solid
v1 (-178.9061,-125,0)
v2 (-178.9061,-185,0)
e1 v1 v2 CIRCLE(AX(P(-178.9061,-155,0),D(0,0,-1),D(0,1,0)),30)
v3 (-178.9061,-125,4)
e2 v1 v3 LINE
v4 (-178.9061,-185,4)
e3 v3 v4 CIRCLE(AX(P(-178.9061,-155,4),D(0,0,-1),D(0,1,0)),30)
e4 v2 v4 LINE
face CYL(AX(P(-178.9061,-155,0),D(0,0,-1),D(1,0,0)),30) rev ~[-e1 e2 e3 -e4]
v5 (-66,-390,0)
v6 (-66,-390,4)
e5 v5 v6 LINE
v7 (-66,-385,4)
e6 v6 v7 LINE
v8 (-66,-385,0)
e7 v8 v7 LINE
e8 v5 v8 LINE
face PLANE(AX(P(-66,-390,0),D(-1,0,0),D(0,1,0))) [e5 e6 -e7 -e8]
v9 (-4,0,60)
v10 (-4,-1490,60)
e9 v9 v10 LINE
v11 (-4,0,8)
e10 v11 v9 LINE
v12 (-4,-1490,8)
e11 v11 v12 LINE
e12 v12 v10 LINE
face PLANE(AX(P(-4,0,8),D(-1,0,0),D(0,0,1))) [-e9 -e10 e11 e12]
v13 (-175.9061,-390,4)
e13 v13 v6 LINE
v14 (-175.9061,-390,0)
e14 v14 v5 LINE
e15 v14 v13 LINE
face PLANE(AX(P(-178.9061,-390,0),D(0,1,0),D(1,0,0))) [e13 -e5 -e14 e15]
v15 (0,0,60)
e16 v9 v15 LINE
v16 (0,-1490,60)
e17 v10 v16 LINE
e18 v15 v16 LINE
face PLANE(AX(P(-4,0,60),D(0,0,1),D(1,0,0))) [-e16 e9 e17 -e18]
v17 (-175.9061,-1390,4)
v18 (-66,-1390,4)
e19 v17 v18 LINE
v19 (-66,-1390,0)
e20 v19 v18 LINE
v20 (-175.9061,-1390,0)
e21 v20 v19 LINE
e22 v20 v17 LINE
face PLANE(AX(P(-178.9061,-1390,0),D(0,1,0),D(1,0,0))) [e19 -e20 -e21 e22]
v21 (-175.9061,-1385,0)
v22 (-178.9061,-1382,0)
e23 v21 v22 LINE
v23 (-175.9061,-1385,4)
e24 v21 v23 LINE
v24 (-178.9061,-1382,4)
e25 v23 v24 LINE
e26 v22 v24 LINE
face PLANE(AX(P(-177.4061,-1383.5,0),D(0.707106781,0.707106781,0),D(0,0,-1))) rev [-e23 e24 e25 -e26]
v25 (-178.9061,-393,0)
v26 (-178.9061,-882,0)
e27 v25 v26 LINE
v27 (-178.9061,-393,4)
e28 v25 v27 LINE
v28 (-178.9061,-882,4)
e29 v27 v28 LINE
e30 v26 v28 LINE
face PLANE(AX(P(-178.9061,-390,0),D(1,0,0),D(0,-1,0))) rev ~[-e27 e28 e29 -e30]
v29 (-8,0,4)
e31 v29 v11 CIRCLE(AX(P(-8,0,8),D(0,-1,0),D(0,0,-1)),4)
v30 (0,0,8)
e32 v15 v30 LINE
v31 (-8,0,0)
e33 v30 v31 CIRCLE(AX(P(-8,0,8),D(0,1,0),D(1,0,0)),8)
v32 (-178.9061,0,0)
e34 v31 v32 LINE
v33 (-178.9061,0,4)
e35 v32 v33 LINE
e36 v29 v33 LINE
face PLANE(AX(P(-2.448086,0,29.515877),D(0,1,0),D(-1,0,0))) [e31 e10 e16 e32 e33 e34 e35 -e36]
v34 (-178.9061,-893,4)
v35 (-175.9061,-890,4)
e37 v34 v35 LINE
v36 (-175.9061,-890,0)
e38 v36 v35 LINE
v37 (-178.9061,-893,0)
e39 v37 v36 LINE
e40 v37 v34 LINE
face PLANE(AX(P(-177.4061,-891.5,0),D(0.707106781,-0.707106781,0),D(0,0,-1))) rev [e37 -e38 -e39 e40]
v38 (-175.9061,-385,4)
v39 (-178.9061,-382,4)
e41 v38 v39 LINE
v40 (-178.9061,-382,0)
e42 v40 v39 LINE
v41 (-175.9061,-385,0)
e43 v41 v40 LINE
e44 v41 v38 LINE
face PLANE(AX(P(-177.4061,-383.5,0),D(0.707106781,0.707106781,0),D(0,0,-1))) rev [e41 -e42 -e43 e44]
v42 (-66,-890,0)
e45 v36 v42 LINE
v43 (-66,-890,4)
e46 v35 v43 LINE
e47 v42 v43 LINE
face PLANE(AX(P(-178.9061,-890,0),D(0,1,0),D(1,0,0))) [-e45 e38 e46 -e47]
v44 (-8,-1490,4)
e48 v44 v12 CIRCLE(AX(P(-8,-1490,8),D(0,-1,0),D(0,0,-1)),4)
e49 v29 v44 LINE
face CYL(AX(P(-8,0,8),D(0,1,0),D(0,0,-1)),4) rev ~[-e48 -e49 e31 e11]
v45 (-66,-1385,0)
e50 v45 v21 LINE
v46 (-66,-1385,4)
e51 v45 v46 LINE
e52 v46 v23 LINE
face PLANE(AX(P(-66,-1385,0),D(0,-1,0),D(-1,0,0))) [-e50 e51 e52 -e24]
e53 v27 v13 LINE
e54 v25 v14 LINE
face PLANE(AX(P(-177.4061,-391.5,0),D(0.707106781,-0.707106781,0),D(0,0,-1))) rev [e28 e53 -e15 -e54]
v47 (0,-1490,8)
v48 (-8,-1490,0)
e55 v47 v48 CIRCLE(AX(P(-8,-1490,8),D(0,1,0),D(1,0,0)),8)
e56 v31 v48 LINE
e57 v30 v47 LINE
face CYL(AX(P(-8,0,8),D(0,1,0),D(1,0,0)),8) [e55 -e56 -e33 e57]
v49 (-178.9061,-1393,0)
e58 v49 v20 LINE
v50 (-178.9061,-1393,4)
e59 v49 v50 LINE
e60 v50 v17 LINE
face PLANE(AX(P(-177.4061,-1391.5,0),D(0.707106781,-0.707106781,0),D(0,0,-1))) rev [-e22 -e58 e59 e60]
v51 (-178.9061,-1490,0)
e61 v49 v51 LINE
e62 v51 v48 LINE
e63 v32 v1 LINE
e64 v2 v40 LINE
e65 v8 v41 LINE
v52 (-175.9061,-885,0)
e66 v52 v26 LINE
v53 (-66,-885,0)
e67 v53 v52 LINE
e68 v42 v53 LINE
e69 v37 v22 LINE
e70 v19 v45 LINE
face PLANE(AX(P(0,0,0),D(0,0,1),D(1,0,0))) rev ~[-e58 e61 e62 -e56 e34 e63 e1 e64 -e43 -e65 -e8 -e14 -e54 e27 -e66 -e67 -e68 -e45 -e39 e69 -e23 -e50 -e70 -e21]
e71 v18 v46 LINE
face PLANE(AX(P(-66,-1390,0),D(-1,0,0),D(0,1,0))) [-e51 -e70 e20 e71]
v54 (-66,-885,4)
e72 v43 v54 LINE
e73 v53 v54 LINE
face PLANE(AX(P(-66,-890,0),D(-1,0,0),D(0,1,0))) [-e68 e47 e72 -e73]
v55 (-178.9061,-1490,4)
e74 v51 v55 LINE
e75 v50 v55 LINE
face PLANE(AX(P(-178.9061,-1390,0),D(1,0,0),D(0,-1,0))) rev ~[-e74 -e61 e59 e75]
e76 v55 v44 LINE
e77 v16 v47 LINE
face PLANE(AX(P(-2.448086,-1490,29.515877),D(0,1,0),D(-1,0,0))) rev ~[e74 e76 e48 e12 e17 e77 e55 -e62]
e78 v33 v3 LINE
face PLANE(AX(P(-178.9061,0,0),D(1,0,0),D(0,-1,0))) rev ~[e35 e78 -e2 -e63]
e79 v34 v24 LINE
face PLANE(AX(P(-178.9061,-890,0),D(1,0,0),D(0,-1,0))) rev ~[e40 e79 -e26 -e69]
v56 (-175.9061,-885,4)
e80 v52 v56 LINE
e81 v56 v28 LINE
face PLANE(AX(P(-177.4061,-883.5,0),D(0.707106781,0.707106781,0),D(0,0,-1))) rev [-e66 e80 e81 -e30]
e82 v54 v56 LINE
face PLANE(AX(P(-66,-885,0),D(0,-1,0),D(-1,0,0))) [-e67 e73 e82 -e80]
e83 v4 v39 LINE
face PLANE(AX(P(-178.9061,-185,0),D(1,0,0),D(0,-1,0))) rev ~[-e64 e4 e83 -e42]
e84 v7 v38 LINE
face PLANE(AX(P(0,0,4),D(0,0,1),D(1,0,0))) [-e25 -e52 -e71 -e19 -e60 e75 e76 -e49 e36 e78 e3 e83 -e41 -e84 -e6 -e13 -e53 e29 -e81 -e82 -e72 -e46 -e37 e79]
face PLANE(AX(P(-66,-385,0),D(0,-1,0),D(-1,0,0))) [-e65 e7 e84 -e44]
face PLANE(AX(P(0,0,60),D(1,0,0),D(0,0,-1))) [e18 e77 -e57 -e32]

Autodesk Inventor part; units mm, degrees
ref_plane "YZ Plane" through (0, 0, 0) normal (1, 0, 0) x (0, 1, 0)
ref_plane "XZ Plane" through (0, 0, 0) normal (0, 1, 0) x (-1, 0, 0)
ref_plane "XY Plane" through (0, 0, 0) normal (0, 0, 1) x (1, 0, 0)
sketch "Sketch1" plane through (0, 0, 0) normal (0, 0, 1) x (1, 0, 0)
  line L0 (0, 0) -> (-178.9061, 0)
  line L1 (-178.9061, 0) -> (-178.9061, -1490)
  line L2 (-178.9061, -1490) -> (0, -1490)
  line L3 (0, -1490) -> (0, 0)
  line L4 (-178.9061, -1390) -> (-66, -1390)
  line L5 (-66, -1390) -> (-66, -1385)
  line L6 (-66, -1385) -> (-178.9061, -1385)
  line L7 (-178.9061, -1385) -> (-178.9061, -1390)
  line L8 (-178.9061, -890) -> (-66, -890)
  line L9 (-66, -890) -> (-66, -885)
  line L10 (-66, -885) -> (-178.9061, -885)
  line L11 (-178.9061, -885) -> (-178.9061, -890)
  line L12 (-178.9061, -390) -> (-66, -390)
  line L13 (-66, -390) -> (-66, -385)
  line L14 (-66, -385) -> (-178.9061, -385)
  line L15 (-178.9061, -385) -> (-178.9061, -390)
  circle A0 centre (-178.9061, -155) radius 30
  point P0 (-178.9061, -390)
  point P1 (-178.9061, -885)
  point P2 (-178.9061, -125)
  point P3 (-178.9061, -185)
  dimension "d0" = 1490
  dimension "d1" = 178.9061
  dimension "d2" = 5
  dimension "d4" = 100
  dimension "d7" = 500
  dimension "d23" = 66
  dimension "d28" = 60
  dimension "d30" = 1335
extrude "Plate1" add sketch "Sketch1" along normal blind 4 contours L3 L2 L1 L4 L5 L6 L8 L9 L10 L12 L13 L14 A0 L0
sketch "Sketch2" plane through (-4, 0, 0) normal (1, 0, 0) x (0, 1, 0)
  line L0 (-1490, 0) -> (0, 0)
  line L1 (0, 0) -> (0, 60)
  line L2 (0, 60) -> (-1490, 60)
  line L3 (-1490, 60) -> (-1490, 0)
edge flange "Flange1" height 60 angle 90 thickness 4 bend radius 4 thickness toward (1, 0, 0) relief tear relief width 4 relief depth 2 edges at (0, -745, 4) wall of the first edge with corners at (-4, -1490, 0) (-4, 0, 0) (-4, 0, 60) (-4, -1490, 60)
bend "Bend1"
corner "Corner1"
chamfer "Corner Chamfer1" distance 3 angle 45 6 edges at (-178.9061, -1390, 2) (-178.9061, -1385, 2) (-178.9061, -890, 2) (-178.9061, -885, 2) (-178.9061, -385, 2) (-178.9061, -390, 2)
equation "\"d0\" = Стрингер_длина"
equation "\"d1\" = стрингер_глубина_2"
equation "\"d2\" = паз_под_стрингер_толщина"
equation "\"d23\" = паз_под_стрингер_глубина - Thickness"
equation "\"d28\" = 2 * радиус_выреза_под_сварку"
equation "\"d12\" = Thickness"
equation "\"d13\" = BendReliefWidth"
equation "\"d14\" = BendReliefDepth"
equation "\"d15\" = MinimumRemnant"
equation "\"d16\" = TransitionRadius"
equation "\"d17\" = ребро_усилителей"
equation "\"d19\" = BendRadius"
equation "\"d20\" = CornerReliefSize"
equation "\"d21\" = GapSize"
equation "\"d22\" = JacobiRadiusSize"
equation "\"BendRadius\" = Thickness"
equation "\"BendReliefWidth\" = Thickness"
equation "\"BendReliefDepth\" = 0.5 * Thickness"
equation "\"CornerReliefSize\" = 4 * Thickness"
equation "\"MinimumRemnant\" = 2 * Thickness"
equation "\"TransitionRadius\" = BendRadius"
equation "\"JacobiRadiusSize\" = BendRadius"
equation "\"GapSize\" = Thickness"
equation "\"Стрингер_длина\" = 1490"
equation "\"стрингер_глубина_2\" = 178.906141"
equation "\"паз_под_стрингер_толщина\" = 5"
equation "\"паз_под_стрингер_глубина\" = 70"
equation "\"Thickness\" = 4"
equation "\"радиус_выреза_под_сварку\" = 30"
equation "\"ребро_усилителей\" = 60"
properties part number "0235 GBK stringer 2" material "Steel"
